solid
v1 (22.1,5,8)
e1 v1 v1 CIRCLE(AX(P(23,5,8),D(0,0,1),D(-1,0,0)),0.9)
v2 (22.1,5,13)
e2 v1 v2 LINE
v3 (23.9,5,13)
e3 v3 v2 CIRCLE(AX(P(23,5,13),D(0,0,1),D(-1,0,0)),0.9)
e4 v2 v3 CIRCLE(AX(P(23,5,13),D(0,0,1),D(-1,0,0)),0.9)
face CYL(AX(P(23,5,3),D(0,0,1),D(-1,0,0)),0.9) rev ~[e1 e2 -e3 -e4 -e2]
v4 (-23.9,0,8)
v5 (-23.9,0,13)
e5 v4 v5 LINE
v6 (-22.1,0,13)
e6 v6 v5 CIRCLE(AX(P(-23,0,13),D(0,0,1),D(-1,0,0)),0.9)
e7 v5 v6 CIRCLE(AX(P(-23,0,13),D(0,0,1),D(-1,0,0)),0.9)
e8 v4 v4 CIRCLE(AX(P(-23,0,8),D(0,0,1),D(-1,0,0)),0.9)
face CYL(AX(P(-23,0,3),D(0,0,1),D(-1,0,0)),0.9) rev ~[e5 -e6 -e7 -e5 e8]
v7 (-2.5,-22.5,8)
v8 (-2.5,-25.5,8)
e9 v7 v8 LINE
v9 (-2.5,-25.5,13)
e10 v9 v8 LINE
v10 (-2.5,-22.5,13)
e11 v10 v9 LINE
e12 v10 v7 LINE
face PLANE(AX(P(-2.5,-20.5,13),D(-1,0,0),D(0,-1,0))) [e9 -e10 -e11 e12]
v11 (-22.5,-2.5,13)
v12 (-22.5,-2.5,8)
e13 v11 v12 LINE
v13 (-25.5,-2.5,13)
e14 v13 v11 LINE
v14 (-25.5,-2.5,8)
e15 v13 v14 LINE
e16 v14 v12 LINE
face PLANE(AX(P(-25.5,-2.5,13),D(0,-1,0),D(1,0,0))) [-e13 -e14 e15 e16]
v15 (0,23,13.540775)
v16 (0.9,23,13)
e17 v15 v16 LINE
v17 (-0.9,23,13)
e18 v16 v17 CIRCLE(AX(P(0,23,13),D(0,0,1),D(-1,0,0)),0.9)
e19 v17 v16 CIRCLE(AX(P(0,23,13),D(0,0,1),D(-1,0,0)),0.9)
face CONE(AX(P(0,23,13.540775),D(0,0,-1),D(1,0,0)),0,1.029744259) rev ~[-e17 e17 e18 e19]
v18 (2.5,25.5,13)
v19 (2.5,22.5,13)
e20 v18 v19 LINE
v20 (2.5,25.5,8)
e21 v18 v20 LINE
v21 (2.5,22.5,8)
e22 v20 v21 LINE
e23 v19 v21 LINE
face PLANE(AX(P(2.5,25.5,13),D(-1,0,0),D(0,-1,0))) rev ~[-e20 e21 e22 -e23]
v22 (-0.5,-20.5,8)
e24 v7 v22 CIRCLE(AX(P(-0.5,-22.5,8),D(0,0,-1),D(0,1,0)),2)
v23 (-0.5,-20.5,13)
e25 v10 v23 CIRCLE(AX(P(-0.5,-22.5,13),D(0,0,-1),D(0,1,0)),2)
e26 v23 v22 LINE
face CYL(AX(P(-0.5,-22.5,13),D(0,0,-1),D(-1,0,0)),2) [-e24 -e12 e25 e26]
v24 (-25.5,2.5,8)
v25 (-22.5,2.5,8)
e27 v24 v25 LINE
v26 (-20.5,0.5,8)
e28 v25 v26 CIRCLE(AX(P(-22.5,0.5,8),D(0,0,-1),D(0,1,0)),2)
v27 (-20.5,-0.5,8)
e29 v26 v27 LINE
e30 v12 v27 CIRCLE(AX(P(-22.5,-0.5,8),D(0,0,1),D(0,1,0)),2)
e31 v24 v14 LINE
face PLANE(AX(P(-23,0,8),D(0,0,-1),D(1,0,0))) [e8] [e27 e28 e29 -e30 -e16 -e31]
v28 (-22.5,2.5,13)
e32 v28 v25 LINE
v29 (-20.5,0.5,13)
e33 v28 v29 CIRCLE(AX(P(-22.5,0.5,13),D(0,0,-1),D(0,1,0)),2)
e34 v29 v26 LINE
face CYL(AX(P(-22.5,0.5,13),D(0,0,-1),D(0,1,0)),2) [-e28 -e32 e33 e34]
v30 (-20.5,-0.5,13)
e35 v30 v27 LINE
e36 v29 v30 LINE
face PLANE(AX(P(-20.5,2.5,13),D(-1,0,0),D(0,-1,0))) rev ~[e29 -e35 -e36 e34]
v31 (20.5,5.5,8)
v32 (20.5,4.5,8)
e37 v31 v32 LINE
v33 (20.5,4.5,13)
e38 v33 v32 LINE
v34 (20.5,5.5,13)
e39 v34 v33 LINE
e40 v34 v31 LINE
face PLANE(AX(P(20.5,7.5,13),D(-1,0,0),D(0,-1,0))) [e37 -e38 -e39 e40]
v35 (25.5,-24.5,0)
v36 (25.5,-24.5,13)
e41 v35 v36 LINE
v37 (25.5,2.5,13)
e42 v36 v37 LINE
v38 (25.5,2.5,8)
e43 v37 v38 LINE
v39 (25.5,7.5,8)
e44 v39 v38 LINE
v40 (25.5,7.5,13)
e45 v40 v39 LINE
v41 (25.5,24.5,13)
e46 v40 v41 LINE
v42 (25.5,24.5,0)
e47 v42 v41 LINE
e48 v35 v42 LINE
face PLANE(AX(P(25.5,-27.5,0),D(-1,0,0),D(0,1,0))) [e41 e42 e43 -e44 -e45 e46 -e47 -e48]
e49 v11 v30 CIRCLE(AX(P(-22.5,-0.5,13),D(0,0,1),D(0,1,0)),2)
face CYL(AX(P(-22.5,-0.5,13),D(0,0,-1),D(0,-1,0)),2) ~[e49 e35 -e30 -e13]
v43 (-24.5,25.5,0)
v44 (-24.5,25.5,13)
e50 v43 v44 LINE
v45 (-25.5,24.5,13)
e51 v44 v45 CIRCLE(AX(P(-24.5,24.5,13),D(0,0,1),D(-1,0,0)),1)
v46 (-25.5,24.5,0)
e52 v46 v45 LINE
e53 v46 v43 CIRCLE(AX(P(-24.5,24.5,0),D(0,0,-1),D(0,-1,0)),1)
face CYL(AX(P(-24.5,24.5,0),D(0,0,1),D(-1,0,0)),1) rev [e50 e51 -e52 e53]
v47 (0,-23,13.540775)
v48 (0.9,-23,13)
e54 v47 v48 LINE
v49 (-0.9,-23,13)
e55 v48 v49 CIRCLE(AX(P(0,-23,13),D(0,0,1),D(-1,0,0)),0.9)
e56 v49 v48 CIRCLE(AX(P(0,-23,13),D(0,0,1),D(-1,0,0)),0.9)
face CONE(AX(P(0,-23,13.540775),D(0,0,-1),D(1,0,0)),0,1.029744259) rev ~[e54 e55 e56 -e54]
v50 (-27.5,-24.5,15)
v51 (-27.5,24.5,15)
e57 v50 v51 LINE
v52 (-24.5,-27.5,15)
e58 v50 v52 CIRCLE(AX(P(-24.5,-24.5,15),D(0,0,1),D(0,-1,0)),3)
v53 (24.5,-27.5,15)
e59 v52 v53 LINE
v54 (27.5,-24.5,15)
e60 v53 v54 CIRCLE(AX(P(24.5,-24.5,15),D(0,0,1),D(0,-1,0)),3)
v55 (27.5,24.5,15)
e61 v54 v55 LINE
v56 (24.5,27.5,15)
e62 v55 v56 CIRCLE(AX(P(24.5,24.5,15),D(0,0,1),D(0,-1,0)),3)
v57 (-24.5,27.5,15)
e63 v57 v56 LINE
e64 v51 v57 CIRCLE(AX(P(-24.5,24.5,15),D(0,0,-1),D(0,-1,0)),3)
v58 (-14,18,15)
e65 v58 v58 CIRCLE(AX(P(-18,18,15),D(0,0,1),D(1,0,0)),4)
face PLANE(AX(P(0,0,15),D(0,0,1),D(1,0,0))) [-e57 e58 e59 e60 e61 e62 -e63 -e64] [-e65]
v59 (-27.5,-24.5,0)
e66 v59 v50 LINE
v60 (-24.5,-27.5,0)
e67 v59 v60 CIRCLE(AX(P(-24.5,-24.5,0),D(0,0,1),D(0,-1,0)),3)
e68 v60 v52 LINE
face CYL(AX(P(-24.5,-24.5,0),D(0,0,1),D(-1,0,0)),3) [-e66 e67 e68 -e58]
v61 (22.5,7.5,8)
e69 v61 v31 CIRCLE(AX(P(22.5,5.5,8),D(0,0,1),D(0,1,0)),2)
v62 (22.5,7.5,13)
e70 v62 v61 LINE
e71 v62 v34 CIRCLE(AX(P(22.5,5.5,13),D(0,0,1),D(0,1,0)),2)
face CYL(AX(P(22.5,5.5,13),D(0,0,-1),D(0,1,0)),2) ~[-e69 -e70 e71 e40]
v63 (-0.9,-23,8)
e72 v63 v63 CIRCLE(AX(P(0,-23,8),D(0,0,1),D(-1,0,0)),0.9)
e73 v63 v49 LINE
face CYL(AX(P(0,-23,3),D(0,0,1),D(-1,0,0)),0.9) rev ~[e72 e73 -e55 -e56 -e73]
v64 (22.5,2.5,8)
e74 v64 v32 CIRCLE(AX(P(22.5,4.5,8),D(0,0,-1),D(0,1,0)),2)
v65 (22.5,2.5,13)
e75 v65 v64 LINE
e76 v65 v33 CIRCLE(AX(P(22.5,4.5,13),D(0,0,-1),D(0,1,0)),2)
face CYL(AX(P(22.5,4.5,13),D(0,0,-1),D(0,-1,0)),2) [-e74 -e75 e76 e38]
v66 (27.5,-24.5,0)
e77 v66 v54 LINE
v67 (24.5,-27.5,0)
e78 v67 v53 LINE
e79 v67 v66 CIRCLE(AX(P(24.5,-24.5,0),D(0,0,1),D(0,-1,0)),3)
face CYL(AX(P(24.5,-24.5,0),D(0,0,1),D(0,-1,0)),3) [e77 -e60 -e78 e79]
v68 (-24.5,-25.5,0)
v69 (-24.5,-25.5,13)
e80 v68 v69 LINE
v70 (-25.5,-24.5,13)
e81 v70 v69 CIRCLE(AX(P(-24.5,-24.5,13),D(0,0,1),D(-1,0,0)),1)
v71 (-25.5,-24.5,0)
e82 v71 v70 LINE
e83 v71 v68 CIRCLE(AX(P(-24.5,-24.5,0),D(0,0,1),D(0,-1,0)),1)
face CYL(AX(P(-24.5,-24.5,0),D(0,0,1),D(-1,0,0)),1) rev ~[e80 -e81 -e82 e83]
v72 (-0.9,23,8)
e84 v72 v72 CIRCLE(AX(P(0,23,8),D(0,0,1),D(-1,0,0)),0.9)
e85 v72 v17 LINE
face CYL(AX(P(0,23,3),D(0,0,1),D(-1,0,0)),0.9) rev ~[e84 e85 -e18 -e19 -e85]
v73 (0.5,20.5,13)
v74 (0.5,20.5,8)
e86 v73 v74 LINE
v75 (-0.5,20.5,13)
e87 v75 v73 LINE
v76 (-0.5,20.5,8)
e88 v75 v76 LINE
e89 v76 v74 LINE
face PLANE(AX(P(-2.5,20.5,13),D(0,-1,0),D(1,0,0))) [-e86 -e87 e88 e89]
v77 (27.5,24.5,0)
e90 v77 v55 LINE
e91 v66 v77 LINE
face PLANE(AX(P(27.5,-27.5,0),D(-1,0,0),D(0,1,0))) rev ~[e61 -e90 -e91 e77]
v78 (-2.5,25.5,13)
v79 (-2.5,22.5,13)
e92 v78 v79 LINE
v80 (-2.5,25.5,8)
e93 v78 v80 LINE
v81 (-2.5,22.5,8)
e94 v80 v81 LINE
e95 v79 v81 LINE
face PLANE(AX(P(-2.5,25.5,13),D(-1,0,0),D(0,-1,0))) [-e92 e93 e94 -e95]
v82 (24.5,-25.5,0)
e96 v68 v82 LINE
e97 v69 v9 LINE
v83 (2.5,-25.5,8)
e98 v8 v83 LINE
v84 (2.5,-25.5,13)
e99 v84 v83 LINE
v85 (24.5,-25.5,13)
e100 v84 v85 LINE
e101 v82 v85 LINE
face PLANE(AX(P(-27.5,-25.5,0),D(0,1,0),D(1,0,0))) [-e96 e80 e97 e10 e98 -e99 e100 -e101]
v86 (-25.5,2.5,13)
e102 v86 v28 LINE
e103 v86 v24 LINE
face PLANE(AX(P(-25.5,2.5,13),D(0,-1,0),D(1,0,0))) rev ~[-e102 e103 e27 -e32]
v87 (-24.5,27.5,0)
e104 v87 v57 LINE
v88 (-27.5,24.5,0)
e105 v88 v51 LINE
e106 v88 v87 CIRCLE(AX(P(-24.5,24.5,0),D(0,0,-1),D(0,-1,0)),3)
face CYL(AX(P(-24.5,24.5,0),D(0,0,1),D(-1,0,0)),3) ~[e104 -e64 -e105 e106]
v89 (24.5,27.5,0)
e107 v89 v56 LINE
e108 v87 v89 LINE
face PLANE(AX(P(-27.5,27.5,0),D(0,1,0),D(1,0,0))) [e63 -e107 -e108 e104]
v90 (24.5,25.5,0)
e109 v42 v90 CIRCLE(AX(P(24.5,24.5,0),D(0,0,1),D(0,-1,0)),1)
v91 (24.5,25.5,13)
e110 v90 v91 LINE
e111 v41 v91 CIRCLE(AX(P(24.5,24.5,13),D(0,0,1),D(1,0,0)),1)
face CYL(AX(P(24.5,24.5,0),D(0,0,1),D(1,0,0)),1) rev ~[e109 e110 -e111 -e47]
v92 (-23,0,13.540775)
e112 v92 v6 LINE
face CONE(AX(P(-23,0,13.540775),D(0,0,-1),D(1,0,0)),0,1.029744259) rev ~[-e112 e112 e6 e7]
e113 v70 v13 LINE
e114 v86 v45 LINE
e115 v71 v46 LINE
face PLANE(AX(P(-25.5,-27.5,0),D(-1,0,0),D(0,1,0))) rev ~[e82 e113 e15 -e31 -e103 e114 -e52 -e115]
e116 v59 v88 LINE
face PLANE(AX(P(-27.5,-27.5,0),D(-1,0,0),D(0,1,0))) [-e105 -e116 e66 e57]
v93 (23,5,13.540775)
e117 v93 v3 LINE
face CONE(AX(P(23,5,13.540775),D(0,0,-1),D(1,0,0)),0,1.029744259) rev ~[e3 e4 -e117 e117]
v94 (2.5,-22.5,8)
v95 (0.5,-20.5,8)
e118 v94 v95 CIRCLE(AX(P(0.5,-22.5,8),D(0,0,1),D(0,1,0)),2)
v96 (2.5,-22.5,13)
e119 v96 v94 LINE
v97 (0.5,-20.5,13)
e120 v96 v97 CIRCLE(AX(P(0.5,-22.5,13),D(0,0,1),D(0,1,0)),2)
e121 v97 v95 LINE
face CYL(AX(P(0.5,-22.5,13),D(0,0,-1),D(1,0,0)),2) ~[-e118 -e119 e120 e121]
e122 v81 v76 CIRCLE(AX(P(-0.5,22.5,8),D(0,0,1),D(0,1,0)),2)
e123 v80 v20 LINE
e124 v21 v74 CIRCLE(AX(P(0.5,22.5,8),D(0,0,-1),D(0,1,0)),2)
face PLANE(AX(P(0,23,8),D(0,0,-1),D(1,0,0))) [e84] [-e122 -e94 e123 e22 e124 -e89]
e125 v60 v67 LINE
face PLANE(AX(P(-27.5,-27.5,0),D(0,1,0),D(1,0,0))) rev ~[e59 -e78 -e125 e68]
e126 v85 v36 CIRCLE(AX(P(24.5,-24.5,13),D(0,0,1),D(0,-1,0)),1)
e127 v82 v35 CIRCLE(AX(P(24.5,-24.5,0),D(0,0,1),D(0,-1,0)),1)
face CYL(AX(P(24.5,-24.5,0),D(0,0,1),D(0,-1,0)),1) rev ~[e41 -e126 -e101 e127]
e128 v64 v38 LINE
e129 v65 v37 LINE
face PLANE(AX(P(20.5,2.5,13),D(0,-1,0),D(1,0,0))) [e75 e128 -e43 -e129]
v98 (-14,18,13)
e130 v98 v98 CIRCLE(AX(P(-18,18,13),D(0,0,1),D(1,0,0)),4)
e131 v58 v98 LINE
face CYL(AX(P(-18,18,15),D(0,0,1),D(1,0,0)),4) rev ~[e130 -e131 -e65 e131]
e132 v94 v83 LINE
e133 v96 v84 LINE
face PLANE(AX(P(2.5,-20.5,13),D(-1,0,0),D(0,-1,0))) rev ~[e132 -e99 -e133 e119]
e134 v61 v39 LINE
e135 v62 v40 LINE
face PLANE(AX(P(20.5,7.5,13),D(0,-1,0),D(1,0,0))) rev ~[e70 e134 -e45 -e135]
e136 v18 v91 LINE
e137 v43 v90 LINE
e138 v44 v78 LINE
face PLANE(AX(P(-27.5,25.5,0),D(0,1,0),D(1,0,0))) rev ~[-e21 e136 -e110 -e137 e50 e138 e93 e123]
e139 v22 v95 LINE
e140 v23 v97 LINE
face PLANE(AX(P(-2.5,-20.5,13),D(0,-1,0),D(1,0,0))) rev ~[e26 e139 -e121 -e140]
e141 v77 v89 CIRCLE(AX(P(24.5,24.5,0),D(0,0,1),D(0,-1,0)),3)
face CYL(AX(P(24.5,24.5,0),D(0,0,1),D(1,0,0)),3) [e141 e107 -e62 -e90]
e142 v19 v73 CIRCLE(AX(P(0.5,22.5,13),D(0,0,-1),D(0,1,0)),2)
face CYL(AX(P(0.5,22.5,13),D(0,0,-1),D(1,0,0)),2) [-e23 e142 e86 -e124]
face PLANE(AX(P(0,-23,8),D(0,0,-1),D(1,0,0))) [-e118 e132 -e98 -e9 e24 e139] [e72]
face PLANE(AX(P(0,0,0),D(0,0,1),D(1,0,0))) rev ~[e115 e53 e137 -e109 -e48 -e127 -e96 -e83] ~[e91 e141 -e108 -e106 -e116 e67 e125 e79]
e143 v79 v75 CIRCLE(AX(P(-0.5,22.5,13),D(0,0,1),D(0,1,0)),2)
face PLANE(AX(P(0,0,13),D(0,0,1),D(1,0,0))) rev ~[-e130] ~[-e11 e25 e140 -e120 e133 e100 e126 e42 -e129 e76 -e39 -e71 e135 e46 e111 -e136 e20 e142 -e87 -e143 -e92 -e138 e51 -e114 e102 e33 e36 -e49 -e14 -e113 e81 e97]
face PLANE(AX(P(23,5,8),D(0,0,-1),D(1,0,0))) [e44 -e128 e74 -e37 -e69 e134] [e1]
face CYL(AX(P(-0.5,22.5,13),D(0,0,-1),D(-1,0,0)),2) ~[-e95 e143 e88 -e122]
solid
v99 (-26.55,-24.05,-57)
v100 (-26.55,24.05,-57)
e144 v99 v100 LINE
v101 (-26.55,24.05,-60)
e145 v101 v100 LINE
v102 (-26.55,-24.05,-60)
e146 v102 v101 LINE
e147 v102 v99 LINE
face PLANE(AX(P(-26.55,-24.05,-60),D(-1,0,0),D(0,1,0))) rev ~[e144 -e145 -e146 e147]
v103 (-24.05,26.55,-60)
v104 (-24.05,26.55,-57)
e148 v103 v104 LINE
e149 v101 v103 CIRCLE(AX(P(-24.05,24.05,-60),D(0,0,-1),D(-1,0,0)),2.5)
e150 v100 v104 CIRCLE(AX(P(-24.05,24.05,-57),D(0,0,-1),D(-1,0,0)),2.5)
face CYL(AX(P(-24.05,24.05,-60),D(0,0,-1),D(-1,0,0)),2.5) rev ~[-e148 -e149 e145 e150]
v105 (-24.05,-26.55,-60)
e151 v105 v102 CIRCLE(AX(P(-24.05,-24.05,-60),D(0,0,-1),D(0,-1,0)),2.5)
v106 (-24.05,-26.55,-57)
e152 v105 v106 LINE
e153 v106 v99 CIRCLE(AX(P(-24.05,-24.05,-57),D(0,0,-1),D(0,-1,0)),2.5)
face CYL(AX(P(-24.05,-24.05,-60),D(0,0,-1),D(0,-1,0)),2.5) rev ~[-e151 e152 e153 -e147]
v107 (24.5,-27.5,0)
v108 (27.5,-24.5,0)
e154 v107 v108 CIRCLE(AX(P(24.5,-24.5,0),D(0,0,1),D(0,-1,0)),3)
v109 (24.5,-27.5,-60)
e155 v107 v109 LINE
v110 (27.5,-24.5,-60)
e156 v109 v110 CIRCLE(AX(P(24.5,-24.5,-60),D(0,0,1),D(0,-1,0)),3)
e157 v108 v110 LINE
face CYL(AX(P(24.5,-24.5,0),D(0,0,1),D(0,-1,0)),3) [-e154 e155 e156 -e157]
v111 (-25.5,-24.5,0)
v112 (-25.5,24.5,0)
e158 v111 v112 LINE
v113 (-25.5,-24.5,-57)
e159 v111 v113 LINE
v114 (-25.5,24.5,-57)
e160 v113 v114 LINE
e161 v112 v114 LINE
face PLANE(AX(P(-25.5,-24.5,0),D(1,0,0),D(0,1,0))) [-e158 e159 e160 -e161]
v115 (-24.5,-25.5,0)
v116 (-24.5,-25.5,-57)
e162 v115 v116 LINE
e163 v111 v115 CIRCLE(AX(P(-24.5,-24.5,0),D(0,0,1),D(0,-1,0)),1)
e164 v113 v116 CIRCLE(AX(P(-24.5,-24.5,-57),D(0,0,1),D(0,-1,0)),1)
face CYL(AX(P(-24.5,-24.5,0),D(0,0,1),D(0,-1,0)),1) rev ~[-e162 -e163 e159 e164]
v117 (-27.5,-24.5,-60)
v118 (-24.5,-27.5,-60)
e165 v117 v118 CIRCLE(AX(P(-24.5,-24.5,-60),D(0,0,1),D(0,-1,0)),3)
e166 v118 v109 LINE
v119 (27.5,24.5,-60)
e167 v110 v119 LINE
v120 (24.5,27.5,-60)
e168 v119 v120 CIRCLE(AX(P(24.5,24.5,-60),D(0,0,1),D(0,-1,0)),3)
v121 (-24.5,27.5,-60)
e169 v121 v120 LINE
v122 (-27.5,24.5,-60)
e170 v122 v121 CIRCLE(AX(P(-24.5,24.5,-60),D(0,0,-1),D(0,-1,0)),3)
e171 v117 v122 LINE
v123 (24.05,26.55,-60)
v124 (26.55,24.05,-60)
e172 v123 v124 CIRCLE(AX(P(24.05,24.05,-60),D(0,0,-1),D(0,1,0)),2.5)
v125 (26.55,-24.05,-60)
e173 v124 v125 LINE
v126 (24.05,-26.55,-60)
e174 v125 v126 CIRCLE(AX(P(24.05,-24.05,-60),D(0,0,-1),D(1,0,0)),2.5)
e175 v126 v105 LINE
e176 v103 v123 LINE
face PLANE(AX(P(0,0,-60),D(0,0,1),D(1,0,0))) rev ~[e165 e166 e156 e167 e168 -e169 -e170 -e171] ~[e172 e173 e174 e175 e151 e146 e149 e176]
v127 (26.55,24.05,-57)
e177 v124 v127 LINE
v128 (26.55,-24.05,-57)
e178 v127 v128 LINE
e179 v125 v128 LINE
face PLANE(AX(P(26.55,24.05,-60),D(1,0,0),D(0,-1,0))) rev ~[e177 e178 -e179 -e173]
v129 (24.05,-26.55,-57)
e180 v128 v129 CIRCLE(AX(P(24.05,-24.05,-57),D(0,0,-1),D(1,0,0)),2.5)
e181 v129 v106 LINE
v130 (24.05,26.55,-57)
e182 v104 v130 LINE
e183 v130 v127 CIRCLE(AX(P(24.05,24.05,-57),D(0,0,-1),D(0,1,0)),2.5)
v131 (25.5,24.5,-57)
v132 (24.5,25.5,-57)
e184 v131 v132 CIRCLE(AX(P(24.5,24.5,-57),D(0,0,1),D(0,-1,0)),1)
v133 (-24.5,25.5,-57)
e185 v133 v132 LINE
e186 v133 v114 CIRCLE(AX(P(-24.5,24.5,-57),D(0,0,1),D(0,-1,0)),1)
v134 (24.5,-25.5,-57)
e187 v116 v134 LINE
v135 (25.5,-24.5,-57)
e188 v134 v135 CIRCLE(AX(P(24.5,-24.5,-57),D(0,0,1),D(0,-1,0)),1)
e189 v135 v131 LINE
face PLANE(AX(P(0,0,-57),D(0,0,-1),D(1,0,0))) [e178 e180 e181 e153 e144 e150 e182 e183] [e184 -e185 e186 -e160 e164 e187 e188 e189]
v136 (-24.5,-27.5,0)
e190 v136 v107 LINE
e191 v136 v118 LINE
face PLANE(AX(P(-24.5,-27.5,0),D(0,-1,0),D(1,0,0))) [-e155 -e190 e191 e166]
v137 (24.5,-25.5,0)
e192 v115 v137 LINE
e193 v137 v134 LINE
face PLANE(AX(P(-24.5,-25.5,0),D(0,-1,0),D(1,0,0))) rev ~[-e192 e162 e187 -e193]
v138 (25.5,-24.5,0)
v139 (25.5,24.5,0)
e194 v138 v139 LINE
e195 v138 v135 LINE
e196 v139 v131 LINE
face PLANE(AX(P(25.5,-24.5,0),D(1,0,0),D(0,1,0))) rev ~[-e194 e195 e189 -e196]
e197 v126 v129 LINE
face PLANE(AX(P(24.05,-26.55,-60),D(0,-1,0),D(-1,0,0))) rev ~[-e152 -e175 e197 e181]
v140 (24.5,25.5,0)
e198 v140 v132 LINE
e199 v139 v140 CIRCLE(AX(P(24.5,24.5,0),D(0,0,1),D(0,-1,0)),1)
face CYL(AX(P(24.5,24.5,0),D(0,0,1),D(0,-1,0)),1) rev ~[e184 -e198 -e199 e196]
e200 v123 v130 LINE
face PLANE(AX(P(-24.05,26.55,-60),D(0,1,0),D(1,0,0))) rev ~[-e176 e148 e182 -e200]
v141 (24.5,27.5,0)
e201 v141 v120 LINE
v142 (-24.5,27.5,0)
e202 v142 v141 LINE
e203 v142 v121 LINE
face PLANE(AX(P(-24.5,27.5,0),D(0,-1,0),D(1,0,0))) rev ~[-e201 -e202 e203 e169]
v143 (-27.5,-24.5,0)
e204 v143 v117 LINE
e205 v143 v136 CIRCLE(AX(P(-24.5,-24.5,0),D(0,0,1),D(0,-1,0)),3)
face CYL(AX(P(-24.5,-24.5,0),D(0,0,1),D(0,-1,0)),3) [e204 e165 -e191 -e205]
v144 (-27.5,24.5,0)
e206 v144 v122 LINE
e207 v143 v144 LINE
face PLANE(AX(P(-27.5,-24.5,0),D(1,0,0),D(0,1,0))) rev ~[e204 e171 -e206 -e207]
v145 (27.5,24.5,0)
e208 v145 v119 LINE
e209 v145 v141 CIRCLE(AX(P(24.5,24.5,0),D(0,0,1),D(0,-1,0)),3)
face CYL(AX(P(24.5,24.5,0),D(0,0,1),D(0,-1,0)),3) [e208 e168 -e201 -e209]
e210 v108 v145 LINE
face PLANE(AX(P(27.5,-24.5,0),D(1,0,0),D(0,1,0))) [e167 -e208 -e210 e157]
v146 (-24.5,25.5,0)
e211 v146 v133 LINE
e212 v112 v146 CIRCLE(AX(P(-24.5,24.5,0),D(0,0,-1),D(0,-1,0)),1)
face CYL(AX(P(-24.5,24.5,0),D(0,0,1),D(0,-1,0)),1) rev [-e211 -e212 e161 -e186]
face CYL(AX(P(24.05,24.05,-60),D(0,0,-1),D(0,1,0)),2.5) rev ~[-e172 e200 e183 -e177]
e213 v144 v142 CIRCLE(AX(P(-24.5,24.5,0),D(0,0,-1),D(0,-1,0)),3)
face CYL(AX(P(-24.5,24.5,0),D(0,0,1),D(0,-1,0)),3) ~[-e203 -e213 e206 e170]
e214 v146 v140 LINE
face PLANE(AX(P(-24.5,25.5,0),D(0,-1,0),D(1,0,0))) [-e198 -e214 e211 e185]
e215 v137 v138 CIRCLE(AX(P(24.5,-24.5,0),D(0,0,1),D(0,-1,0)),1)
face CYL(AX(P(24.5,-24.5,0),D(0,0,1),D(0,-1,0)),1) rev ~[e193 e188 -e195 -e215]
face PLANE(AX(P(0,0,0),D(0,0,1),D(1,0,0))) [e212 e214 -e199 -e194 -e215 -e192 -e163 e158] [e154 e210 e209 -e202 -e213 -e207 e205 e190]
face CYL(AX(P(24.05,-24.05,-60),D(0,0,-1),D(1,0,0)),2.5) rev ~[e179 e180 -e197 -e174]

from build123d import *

# Parameters (mm, degrees)
F0_W      = 55
F0_H      = 55
F1_DEPTH  = 15
F2_R      = 3
F3_T      = -2
F4_R      = 4
F5_DEPTH  = 25
F6_DEPTH  = 60
F8_DEPTH  = 3
F9_W      = 5
F9_H      = 5
F10_DEPTH = 5
F11_R     = 2
F13_D     = 1.8
F13_DEPTH = 5
F13_TIP   = 0.5407745571


# Not quite as in the source:
# - a feature names something its author has since deleted; it is built from what else it names


with BuildPart() as f1:
    # F0 (on Top) → F1 (new body)
    with BuildSketch(Plane.XY):
        Rectangle(F0_W, F0_H)
    extrude(amount=F1_DEPTH)

    # F2
    f2_edges = [f1.edges().sort_by_distance(p)[0] for p in [
        (-27.5, 27.5, 7.5),
        (-27.5, -27.5, 7.5),
        (27.5, -27.5, 7.5),
        (27.5, 27.5, 7.5),
    ]]
    fillet(f2_edges, radius=F2_R)

    # F3
    f3_openings = [f1.faces().sort_by_distance(p)[0] for p in [
        (0, 0, 0),
    ]]
    offset(amount=F3_T, openings=f3_openings)

    # F4 (on face) → F5 (cut)
    with BuildSketch(Plane.XY.offset(15)):
        with Locations((-18, 18)):
            Circle(F4_R)
    extrude(amount=-F5_DEPTH, mode=Mode.SUBTRACT)


with BuildPart() as f6:
    # F6 (new): a face of the model
    f6_faces = [f1.part.faces().sort_by_distance(p)[0] for p in [
        (0, -26.7221825407, 0),
    ]]
    extrude(f6_faces, amount=F6_DEPTH)

    # F7 (on face) → F8 (cut)
    with BuildSketch(Plane(origin=(0, 0, -60), x_dir=(1, 0, 0), z_dir=(0, 0, -1))):
        with BuildLine():
            Line((-24.05, -26.55), (24.05, -26.55))
            ThreePointArc((24.05, -26.55), (25.817766953, -25.817766953), (26.55, -24.05))
            Line((26.55, -24.05), (26.55, 24.05))
            ThreePointArc((26.55, 24.05), (25.817766953, 25.817766953), (24.05, 26.55))
            Line((24.05, 26.55), (-24.05, 26.55))
            ThreePointArc((-24.05, 26.55), (-25.817766953, 25.817766953), (-26.55, 24.05))
            Line((-26.55, 24.05), (-26.55, -24.05))
            ThreePointArc((-26.55, -24.05), (-25.817766953, -25.817766953), (-24.05, -26.55))
        make_face()
    extrude(amount=-F8_DEPTH, mode=Mode.SUBTRACT)


with BuildPart() as f1_1:
    add(f1.part)

    # F9 (on face) → F10 (join)
    with BuildSketch(Plane(origin=(0, 0, 13), x_dir=(1, 0, 0), z_dir=(0, 0, -1))):
        with Locations((-23, 0)):
            Rectangle(F9_W, F9_H)
        with Locations((0, -23)):
            Rectangle(F9_W, F9_H)
        with Locations((0, 23)):
            Rectangle(F9_W, F9_H)
        with Locations((23, -5)):
            Rectangle(F9_W, F9_H)
    extrude(amount=F10_DEPTH)

    # F11
    f11_edges = [f1_1.edges().sort_by_distance(p)[0] for p in [
        (-20.5, 2.5, 10.5),
        (-20.5, -2.5, 10.5),
        (2.5, 20.5, 10.5),
        (-2.5, 20.5, 10.5),
        (-2.5, -20.5, 10.5),
        (2.5, -20.5, 10.5),
        (20.5, 2.5, 10.5),
        (20.5, 7.5, 10.5),
    ]]
    fillet(f11_edges, radius=F11_R)

    # F13
    with Locations(Plane(origin=(0, 0, 8), x_dir=(1, 0, 0), z_dir=(0, 0, -1))):
        with Locations((23, -5), (0, -23), (0, 23), (-23, 0)):
            Hole(F13_D / 2, depth=F13_DEPTH)
            with Locations((0, 0, -(F13_DEPTH + F13_TIP / 2))):  # 118° drill point
                Cone(0, F13_D / 2, F13_TIP, mode=Mode.SUBTRACT)


solid = Compound([f6.part, f1_1.part])
